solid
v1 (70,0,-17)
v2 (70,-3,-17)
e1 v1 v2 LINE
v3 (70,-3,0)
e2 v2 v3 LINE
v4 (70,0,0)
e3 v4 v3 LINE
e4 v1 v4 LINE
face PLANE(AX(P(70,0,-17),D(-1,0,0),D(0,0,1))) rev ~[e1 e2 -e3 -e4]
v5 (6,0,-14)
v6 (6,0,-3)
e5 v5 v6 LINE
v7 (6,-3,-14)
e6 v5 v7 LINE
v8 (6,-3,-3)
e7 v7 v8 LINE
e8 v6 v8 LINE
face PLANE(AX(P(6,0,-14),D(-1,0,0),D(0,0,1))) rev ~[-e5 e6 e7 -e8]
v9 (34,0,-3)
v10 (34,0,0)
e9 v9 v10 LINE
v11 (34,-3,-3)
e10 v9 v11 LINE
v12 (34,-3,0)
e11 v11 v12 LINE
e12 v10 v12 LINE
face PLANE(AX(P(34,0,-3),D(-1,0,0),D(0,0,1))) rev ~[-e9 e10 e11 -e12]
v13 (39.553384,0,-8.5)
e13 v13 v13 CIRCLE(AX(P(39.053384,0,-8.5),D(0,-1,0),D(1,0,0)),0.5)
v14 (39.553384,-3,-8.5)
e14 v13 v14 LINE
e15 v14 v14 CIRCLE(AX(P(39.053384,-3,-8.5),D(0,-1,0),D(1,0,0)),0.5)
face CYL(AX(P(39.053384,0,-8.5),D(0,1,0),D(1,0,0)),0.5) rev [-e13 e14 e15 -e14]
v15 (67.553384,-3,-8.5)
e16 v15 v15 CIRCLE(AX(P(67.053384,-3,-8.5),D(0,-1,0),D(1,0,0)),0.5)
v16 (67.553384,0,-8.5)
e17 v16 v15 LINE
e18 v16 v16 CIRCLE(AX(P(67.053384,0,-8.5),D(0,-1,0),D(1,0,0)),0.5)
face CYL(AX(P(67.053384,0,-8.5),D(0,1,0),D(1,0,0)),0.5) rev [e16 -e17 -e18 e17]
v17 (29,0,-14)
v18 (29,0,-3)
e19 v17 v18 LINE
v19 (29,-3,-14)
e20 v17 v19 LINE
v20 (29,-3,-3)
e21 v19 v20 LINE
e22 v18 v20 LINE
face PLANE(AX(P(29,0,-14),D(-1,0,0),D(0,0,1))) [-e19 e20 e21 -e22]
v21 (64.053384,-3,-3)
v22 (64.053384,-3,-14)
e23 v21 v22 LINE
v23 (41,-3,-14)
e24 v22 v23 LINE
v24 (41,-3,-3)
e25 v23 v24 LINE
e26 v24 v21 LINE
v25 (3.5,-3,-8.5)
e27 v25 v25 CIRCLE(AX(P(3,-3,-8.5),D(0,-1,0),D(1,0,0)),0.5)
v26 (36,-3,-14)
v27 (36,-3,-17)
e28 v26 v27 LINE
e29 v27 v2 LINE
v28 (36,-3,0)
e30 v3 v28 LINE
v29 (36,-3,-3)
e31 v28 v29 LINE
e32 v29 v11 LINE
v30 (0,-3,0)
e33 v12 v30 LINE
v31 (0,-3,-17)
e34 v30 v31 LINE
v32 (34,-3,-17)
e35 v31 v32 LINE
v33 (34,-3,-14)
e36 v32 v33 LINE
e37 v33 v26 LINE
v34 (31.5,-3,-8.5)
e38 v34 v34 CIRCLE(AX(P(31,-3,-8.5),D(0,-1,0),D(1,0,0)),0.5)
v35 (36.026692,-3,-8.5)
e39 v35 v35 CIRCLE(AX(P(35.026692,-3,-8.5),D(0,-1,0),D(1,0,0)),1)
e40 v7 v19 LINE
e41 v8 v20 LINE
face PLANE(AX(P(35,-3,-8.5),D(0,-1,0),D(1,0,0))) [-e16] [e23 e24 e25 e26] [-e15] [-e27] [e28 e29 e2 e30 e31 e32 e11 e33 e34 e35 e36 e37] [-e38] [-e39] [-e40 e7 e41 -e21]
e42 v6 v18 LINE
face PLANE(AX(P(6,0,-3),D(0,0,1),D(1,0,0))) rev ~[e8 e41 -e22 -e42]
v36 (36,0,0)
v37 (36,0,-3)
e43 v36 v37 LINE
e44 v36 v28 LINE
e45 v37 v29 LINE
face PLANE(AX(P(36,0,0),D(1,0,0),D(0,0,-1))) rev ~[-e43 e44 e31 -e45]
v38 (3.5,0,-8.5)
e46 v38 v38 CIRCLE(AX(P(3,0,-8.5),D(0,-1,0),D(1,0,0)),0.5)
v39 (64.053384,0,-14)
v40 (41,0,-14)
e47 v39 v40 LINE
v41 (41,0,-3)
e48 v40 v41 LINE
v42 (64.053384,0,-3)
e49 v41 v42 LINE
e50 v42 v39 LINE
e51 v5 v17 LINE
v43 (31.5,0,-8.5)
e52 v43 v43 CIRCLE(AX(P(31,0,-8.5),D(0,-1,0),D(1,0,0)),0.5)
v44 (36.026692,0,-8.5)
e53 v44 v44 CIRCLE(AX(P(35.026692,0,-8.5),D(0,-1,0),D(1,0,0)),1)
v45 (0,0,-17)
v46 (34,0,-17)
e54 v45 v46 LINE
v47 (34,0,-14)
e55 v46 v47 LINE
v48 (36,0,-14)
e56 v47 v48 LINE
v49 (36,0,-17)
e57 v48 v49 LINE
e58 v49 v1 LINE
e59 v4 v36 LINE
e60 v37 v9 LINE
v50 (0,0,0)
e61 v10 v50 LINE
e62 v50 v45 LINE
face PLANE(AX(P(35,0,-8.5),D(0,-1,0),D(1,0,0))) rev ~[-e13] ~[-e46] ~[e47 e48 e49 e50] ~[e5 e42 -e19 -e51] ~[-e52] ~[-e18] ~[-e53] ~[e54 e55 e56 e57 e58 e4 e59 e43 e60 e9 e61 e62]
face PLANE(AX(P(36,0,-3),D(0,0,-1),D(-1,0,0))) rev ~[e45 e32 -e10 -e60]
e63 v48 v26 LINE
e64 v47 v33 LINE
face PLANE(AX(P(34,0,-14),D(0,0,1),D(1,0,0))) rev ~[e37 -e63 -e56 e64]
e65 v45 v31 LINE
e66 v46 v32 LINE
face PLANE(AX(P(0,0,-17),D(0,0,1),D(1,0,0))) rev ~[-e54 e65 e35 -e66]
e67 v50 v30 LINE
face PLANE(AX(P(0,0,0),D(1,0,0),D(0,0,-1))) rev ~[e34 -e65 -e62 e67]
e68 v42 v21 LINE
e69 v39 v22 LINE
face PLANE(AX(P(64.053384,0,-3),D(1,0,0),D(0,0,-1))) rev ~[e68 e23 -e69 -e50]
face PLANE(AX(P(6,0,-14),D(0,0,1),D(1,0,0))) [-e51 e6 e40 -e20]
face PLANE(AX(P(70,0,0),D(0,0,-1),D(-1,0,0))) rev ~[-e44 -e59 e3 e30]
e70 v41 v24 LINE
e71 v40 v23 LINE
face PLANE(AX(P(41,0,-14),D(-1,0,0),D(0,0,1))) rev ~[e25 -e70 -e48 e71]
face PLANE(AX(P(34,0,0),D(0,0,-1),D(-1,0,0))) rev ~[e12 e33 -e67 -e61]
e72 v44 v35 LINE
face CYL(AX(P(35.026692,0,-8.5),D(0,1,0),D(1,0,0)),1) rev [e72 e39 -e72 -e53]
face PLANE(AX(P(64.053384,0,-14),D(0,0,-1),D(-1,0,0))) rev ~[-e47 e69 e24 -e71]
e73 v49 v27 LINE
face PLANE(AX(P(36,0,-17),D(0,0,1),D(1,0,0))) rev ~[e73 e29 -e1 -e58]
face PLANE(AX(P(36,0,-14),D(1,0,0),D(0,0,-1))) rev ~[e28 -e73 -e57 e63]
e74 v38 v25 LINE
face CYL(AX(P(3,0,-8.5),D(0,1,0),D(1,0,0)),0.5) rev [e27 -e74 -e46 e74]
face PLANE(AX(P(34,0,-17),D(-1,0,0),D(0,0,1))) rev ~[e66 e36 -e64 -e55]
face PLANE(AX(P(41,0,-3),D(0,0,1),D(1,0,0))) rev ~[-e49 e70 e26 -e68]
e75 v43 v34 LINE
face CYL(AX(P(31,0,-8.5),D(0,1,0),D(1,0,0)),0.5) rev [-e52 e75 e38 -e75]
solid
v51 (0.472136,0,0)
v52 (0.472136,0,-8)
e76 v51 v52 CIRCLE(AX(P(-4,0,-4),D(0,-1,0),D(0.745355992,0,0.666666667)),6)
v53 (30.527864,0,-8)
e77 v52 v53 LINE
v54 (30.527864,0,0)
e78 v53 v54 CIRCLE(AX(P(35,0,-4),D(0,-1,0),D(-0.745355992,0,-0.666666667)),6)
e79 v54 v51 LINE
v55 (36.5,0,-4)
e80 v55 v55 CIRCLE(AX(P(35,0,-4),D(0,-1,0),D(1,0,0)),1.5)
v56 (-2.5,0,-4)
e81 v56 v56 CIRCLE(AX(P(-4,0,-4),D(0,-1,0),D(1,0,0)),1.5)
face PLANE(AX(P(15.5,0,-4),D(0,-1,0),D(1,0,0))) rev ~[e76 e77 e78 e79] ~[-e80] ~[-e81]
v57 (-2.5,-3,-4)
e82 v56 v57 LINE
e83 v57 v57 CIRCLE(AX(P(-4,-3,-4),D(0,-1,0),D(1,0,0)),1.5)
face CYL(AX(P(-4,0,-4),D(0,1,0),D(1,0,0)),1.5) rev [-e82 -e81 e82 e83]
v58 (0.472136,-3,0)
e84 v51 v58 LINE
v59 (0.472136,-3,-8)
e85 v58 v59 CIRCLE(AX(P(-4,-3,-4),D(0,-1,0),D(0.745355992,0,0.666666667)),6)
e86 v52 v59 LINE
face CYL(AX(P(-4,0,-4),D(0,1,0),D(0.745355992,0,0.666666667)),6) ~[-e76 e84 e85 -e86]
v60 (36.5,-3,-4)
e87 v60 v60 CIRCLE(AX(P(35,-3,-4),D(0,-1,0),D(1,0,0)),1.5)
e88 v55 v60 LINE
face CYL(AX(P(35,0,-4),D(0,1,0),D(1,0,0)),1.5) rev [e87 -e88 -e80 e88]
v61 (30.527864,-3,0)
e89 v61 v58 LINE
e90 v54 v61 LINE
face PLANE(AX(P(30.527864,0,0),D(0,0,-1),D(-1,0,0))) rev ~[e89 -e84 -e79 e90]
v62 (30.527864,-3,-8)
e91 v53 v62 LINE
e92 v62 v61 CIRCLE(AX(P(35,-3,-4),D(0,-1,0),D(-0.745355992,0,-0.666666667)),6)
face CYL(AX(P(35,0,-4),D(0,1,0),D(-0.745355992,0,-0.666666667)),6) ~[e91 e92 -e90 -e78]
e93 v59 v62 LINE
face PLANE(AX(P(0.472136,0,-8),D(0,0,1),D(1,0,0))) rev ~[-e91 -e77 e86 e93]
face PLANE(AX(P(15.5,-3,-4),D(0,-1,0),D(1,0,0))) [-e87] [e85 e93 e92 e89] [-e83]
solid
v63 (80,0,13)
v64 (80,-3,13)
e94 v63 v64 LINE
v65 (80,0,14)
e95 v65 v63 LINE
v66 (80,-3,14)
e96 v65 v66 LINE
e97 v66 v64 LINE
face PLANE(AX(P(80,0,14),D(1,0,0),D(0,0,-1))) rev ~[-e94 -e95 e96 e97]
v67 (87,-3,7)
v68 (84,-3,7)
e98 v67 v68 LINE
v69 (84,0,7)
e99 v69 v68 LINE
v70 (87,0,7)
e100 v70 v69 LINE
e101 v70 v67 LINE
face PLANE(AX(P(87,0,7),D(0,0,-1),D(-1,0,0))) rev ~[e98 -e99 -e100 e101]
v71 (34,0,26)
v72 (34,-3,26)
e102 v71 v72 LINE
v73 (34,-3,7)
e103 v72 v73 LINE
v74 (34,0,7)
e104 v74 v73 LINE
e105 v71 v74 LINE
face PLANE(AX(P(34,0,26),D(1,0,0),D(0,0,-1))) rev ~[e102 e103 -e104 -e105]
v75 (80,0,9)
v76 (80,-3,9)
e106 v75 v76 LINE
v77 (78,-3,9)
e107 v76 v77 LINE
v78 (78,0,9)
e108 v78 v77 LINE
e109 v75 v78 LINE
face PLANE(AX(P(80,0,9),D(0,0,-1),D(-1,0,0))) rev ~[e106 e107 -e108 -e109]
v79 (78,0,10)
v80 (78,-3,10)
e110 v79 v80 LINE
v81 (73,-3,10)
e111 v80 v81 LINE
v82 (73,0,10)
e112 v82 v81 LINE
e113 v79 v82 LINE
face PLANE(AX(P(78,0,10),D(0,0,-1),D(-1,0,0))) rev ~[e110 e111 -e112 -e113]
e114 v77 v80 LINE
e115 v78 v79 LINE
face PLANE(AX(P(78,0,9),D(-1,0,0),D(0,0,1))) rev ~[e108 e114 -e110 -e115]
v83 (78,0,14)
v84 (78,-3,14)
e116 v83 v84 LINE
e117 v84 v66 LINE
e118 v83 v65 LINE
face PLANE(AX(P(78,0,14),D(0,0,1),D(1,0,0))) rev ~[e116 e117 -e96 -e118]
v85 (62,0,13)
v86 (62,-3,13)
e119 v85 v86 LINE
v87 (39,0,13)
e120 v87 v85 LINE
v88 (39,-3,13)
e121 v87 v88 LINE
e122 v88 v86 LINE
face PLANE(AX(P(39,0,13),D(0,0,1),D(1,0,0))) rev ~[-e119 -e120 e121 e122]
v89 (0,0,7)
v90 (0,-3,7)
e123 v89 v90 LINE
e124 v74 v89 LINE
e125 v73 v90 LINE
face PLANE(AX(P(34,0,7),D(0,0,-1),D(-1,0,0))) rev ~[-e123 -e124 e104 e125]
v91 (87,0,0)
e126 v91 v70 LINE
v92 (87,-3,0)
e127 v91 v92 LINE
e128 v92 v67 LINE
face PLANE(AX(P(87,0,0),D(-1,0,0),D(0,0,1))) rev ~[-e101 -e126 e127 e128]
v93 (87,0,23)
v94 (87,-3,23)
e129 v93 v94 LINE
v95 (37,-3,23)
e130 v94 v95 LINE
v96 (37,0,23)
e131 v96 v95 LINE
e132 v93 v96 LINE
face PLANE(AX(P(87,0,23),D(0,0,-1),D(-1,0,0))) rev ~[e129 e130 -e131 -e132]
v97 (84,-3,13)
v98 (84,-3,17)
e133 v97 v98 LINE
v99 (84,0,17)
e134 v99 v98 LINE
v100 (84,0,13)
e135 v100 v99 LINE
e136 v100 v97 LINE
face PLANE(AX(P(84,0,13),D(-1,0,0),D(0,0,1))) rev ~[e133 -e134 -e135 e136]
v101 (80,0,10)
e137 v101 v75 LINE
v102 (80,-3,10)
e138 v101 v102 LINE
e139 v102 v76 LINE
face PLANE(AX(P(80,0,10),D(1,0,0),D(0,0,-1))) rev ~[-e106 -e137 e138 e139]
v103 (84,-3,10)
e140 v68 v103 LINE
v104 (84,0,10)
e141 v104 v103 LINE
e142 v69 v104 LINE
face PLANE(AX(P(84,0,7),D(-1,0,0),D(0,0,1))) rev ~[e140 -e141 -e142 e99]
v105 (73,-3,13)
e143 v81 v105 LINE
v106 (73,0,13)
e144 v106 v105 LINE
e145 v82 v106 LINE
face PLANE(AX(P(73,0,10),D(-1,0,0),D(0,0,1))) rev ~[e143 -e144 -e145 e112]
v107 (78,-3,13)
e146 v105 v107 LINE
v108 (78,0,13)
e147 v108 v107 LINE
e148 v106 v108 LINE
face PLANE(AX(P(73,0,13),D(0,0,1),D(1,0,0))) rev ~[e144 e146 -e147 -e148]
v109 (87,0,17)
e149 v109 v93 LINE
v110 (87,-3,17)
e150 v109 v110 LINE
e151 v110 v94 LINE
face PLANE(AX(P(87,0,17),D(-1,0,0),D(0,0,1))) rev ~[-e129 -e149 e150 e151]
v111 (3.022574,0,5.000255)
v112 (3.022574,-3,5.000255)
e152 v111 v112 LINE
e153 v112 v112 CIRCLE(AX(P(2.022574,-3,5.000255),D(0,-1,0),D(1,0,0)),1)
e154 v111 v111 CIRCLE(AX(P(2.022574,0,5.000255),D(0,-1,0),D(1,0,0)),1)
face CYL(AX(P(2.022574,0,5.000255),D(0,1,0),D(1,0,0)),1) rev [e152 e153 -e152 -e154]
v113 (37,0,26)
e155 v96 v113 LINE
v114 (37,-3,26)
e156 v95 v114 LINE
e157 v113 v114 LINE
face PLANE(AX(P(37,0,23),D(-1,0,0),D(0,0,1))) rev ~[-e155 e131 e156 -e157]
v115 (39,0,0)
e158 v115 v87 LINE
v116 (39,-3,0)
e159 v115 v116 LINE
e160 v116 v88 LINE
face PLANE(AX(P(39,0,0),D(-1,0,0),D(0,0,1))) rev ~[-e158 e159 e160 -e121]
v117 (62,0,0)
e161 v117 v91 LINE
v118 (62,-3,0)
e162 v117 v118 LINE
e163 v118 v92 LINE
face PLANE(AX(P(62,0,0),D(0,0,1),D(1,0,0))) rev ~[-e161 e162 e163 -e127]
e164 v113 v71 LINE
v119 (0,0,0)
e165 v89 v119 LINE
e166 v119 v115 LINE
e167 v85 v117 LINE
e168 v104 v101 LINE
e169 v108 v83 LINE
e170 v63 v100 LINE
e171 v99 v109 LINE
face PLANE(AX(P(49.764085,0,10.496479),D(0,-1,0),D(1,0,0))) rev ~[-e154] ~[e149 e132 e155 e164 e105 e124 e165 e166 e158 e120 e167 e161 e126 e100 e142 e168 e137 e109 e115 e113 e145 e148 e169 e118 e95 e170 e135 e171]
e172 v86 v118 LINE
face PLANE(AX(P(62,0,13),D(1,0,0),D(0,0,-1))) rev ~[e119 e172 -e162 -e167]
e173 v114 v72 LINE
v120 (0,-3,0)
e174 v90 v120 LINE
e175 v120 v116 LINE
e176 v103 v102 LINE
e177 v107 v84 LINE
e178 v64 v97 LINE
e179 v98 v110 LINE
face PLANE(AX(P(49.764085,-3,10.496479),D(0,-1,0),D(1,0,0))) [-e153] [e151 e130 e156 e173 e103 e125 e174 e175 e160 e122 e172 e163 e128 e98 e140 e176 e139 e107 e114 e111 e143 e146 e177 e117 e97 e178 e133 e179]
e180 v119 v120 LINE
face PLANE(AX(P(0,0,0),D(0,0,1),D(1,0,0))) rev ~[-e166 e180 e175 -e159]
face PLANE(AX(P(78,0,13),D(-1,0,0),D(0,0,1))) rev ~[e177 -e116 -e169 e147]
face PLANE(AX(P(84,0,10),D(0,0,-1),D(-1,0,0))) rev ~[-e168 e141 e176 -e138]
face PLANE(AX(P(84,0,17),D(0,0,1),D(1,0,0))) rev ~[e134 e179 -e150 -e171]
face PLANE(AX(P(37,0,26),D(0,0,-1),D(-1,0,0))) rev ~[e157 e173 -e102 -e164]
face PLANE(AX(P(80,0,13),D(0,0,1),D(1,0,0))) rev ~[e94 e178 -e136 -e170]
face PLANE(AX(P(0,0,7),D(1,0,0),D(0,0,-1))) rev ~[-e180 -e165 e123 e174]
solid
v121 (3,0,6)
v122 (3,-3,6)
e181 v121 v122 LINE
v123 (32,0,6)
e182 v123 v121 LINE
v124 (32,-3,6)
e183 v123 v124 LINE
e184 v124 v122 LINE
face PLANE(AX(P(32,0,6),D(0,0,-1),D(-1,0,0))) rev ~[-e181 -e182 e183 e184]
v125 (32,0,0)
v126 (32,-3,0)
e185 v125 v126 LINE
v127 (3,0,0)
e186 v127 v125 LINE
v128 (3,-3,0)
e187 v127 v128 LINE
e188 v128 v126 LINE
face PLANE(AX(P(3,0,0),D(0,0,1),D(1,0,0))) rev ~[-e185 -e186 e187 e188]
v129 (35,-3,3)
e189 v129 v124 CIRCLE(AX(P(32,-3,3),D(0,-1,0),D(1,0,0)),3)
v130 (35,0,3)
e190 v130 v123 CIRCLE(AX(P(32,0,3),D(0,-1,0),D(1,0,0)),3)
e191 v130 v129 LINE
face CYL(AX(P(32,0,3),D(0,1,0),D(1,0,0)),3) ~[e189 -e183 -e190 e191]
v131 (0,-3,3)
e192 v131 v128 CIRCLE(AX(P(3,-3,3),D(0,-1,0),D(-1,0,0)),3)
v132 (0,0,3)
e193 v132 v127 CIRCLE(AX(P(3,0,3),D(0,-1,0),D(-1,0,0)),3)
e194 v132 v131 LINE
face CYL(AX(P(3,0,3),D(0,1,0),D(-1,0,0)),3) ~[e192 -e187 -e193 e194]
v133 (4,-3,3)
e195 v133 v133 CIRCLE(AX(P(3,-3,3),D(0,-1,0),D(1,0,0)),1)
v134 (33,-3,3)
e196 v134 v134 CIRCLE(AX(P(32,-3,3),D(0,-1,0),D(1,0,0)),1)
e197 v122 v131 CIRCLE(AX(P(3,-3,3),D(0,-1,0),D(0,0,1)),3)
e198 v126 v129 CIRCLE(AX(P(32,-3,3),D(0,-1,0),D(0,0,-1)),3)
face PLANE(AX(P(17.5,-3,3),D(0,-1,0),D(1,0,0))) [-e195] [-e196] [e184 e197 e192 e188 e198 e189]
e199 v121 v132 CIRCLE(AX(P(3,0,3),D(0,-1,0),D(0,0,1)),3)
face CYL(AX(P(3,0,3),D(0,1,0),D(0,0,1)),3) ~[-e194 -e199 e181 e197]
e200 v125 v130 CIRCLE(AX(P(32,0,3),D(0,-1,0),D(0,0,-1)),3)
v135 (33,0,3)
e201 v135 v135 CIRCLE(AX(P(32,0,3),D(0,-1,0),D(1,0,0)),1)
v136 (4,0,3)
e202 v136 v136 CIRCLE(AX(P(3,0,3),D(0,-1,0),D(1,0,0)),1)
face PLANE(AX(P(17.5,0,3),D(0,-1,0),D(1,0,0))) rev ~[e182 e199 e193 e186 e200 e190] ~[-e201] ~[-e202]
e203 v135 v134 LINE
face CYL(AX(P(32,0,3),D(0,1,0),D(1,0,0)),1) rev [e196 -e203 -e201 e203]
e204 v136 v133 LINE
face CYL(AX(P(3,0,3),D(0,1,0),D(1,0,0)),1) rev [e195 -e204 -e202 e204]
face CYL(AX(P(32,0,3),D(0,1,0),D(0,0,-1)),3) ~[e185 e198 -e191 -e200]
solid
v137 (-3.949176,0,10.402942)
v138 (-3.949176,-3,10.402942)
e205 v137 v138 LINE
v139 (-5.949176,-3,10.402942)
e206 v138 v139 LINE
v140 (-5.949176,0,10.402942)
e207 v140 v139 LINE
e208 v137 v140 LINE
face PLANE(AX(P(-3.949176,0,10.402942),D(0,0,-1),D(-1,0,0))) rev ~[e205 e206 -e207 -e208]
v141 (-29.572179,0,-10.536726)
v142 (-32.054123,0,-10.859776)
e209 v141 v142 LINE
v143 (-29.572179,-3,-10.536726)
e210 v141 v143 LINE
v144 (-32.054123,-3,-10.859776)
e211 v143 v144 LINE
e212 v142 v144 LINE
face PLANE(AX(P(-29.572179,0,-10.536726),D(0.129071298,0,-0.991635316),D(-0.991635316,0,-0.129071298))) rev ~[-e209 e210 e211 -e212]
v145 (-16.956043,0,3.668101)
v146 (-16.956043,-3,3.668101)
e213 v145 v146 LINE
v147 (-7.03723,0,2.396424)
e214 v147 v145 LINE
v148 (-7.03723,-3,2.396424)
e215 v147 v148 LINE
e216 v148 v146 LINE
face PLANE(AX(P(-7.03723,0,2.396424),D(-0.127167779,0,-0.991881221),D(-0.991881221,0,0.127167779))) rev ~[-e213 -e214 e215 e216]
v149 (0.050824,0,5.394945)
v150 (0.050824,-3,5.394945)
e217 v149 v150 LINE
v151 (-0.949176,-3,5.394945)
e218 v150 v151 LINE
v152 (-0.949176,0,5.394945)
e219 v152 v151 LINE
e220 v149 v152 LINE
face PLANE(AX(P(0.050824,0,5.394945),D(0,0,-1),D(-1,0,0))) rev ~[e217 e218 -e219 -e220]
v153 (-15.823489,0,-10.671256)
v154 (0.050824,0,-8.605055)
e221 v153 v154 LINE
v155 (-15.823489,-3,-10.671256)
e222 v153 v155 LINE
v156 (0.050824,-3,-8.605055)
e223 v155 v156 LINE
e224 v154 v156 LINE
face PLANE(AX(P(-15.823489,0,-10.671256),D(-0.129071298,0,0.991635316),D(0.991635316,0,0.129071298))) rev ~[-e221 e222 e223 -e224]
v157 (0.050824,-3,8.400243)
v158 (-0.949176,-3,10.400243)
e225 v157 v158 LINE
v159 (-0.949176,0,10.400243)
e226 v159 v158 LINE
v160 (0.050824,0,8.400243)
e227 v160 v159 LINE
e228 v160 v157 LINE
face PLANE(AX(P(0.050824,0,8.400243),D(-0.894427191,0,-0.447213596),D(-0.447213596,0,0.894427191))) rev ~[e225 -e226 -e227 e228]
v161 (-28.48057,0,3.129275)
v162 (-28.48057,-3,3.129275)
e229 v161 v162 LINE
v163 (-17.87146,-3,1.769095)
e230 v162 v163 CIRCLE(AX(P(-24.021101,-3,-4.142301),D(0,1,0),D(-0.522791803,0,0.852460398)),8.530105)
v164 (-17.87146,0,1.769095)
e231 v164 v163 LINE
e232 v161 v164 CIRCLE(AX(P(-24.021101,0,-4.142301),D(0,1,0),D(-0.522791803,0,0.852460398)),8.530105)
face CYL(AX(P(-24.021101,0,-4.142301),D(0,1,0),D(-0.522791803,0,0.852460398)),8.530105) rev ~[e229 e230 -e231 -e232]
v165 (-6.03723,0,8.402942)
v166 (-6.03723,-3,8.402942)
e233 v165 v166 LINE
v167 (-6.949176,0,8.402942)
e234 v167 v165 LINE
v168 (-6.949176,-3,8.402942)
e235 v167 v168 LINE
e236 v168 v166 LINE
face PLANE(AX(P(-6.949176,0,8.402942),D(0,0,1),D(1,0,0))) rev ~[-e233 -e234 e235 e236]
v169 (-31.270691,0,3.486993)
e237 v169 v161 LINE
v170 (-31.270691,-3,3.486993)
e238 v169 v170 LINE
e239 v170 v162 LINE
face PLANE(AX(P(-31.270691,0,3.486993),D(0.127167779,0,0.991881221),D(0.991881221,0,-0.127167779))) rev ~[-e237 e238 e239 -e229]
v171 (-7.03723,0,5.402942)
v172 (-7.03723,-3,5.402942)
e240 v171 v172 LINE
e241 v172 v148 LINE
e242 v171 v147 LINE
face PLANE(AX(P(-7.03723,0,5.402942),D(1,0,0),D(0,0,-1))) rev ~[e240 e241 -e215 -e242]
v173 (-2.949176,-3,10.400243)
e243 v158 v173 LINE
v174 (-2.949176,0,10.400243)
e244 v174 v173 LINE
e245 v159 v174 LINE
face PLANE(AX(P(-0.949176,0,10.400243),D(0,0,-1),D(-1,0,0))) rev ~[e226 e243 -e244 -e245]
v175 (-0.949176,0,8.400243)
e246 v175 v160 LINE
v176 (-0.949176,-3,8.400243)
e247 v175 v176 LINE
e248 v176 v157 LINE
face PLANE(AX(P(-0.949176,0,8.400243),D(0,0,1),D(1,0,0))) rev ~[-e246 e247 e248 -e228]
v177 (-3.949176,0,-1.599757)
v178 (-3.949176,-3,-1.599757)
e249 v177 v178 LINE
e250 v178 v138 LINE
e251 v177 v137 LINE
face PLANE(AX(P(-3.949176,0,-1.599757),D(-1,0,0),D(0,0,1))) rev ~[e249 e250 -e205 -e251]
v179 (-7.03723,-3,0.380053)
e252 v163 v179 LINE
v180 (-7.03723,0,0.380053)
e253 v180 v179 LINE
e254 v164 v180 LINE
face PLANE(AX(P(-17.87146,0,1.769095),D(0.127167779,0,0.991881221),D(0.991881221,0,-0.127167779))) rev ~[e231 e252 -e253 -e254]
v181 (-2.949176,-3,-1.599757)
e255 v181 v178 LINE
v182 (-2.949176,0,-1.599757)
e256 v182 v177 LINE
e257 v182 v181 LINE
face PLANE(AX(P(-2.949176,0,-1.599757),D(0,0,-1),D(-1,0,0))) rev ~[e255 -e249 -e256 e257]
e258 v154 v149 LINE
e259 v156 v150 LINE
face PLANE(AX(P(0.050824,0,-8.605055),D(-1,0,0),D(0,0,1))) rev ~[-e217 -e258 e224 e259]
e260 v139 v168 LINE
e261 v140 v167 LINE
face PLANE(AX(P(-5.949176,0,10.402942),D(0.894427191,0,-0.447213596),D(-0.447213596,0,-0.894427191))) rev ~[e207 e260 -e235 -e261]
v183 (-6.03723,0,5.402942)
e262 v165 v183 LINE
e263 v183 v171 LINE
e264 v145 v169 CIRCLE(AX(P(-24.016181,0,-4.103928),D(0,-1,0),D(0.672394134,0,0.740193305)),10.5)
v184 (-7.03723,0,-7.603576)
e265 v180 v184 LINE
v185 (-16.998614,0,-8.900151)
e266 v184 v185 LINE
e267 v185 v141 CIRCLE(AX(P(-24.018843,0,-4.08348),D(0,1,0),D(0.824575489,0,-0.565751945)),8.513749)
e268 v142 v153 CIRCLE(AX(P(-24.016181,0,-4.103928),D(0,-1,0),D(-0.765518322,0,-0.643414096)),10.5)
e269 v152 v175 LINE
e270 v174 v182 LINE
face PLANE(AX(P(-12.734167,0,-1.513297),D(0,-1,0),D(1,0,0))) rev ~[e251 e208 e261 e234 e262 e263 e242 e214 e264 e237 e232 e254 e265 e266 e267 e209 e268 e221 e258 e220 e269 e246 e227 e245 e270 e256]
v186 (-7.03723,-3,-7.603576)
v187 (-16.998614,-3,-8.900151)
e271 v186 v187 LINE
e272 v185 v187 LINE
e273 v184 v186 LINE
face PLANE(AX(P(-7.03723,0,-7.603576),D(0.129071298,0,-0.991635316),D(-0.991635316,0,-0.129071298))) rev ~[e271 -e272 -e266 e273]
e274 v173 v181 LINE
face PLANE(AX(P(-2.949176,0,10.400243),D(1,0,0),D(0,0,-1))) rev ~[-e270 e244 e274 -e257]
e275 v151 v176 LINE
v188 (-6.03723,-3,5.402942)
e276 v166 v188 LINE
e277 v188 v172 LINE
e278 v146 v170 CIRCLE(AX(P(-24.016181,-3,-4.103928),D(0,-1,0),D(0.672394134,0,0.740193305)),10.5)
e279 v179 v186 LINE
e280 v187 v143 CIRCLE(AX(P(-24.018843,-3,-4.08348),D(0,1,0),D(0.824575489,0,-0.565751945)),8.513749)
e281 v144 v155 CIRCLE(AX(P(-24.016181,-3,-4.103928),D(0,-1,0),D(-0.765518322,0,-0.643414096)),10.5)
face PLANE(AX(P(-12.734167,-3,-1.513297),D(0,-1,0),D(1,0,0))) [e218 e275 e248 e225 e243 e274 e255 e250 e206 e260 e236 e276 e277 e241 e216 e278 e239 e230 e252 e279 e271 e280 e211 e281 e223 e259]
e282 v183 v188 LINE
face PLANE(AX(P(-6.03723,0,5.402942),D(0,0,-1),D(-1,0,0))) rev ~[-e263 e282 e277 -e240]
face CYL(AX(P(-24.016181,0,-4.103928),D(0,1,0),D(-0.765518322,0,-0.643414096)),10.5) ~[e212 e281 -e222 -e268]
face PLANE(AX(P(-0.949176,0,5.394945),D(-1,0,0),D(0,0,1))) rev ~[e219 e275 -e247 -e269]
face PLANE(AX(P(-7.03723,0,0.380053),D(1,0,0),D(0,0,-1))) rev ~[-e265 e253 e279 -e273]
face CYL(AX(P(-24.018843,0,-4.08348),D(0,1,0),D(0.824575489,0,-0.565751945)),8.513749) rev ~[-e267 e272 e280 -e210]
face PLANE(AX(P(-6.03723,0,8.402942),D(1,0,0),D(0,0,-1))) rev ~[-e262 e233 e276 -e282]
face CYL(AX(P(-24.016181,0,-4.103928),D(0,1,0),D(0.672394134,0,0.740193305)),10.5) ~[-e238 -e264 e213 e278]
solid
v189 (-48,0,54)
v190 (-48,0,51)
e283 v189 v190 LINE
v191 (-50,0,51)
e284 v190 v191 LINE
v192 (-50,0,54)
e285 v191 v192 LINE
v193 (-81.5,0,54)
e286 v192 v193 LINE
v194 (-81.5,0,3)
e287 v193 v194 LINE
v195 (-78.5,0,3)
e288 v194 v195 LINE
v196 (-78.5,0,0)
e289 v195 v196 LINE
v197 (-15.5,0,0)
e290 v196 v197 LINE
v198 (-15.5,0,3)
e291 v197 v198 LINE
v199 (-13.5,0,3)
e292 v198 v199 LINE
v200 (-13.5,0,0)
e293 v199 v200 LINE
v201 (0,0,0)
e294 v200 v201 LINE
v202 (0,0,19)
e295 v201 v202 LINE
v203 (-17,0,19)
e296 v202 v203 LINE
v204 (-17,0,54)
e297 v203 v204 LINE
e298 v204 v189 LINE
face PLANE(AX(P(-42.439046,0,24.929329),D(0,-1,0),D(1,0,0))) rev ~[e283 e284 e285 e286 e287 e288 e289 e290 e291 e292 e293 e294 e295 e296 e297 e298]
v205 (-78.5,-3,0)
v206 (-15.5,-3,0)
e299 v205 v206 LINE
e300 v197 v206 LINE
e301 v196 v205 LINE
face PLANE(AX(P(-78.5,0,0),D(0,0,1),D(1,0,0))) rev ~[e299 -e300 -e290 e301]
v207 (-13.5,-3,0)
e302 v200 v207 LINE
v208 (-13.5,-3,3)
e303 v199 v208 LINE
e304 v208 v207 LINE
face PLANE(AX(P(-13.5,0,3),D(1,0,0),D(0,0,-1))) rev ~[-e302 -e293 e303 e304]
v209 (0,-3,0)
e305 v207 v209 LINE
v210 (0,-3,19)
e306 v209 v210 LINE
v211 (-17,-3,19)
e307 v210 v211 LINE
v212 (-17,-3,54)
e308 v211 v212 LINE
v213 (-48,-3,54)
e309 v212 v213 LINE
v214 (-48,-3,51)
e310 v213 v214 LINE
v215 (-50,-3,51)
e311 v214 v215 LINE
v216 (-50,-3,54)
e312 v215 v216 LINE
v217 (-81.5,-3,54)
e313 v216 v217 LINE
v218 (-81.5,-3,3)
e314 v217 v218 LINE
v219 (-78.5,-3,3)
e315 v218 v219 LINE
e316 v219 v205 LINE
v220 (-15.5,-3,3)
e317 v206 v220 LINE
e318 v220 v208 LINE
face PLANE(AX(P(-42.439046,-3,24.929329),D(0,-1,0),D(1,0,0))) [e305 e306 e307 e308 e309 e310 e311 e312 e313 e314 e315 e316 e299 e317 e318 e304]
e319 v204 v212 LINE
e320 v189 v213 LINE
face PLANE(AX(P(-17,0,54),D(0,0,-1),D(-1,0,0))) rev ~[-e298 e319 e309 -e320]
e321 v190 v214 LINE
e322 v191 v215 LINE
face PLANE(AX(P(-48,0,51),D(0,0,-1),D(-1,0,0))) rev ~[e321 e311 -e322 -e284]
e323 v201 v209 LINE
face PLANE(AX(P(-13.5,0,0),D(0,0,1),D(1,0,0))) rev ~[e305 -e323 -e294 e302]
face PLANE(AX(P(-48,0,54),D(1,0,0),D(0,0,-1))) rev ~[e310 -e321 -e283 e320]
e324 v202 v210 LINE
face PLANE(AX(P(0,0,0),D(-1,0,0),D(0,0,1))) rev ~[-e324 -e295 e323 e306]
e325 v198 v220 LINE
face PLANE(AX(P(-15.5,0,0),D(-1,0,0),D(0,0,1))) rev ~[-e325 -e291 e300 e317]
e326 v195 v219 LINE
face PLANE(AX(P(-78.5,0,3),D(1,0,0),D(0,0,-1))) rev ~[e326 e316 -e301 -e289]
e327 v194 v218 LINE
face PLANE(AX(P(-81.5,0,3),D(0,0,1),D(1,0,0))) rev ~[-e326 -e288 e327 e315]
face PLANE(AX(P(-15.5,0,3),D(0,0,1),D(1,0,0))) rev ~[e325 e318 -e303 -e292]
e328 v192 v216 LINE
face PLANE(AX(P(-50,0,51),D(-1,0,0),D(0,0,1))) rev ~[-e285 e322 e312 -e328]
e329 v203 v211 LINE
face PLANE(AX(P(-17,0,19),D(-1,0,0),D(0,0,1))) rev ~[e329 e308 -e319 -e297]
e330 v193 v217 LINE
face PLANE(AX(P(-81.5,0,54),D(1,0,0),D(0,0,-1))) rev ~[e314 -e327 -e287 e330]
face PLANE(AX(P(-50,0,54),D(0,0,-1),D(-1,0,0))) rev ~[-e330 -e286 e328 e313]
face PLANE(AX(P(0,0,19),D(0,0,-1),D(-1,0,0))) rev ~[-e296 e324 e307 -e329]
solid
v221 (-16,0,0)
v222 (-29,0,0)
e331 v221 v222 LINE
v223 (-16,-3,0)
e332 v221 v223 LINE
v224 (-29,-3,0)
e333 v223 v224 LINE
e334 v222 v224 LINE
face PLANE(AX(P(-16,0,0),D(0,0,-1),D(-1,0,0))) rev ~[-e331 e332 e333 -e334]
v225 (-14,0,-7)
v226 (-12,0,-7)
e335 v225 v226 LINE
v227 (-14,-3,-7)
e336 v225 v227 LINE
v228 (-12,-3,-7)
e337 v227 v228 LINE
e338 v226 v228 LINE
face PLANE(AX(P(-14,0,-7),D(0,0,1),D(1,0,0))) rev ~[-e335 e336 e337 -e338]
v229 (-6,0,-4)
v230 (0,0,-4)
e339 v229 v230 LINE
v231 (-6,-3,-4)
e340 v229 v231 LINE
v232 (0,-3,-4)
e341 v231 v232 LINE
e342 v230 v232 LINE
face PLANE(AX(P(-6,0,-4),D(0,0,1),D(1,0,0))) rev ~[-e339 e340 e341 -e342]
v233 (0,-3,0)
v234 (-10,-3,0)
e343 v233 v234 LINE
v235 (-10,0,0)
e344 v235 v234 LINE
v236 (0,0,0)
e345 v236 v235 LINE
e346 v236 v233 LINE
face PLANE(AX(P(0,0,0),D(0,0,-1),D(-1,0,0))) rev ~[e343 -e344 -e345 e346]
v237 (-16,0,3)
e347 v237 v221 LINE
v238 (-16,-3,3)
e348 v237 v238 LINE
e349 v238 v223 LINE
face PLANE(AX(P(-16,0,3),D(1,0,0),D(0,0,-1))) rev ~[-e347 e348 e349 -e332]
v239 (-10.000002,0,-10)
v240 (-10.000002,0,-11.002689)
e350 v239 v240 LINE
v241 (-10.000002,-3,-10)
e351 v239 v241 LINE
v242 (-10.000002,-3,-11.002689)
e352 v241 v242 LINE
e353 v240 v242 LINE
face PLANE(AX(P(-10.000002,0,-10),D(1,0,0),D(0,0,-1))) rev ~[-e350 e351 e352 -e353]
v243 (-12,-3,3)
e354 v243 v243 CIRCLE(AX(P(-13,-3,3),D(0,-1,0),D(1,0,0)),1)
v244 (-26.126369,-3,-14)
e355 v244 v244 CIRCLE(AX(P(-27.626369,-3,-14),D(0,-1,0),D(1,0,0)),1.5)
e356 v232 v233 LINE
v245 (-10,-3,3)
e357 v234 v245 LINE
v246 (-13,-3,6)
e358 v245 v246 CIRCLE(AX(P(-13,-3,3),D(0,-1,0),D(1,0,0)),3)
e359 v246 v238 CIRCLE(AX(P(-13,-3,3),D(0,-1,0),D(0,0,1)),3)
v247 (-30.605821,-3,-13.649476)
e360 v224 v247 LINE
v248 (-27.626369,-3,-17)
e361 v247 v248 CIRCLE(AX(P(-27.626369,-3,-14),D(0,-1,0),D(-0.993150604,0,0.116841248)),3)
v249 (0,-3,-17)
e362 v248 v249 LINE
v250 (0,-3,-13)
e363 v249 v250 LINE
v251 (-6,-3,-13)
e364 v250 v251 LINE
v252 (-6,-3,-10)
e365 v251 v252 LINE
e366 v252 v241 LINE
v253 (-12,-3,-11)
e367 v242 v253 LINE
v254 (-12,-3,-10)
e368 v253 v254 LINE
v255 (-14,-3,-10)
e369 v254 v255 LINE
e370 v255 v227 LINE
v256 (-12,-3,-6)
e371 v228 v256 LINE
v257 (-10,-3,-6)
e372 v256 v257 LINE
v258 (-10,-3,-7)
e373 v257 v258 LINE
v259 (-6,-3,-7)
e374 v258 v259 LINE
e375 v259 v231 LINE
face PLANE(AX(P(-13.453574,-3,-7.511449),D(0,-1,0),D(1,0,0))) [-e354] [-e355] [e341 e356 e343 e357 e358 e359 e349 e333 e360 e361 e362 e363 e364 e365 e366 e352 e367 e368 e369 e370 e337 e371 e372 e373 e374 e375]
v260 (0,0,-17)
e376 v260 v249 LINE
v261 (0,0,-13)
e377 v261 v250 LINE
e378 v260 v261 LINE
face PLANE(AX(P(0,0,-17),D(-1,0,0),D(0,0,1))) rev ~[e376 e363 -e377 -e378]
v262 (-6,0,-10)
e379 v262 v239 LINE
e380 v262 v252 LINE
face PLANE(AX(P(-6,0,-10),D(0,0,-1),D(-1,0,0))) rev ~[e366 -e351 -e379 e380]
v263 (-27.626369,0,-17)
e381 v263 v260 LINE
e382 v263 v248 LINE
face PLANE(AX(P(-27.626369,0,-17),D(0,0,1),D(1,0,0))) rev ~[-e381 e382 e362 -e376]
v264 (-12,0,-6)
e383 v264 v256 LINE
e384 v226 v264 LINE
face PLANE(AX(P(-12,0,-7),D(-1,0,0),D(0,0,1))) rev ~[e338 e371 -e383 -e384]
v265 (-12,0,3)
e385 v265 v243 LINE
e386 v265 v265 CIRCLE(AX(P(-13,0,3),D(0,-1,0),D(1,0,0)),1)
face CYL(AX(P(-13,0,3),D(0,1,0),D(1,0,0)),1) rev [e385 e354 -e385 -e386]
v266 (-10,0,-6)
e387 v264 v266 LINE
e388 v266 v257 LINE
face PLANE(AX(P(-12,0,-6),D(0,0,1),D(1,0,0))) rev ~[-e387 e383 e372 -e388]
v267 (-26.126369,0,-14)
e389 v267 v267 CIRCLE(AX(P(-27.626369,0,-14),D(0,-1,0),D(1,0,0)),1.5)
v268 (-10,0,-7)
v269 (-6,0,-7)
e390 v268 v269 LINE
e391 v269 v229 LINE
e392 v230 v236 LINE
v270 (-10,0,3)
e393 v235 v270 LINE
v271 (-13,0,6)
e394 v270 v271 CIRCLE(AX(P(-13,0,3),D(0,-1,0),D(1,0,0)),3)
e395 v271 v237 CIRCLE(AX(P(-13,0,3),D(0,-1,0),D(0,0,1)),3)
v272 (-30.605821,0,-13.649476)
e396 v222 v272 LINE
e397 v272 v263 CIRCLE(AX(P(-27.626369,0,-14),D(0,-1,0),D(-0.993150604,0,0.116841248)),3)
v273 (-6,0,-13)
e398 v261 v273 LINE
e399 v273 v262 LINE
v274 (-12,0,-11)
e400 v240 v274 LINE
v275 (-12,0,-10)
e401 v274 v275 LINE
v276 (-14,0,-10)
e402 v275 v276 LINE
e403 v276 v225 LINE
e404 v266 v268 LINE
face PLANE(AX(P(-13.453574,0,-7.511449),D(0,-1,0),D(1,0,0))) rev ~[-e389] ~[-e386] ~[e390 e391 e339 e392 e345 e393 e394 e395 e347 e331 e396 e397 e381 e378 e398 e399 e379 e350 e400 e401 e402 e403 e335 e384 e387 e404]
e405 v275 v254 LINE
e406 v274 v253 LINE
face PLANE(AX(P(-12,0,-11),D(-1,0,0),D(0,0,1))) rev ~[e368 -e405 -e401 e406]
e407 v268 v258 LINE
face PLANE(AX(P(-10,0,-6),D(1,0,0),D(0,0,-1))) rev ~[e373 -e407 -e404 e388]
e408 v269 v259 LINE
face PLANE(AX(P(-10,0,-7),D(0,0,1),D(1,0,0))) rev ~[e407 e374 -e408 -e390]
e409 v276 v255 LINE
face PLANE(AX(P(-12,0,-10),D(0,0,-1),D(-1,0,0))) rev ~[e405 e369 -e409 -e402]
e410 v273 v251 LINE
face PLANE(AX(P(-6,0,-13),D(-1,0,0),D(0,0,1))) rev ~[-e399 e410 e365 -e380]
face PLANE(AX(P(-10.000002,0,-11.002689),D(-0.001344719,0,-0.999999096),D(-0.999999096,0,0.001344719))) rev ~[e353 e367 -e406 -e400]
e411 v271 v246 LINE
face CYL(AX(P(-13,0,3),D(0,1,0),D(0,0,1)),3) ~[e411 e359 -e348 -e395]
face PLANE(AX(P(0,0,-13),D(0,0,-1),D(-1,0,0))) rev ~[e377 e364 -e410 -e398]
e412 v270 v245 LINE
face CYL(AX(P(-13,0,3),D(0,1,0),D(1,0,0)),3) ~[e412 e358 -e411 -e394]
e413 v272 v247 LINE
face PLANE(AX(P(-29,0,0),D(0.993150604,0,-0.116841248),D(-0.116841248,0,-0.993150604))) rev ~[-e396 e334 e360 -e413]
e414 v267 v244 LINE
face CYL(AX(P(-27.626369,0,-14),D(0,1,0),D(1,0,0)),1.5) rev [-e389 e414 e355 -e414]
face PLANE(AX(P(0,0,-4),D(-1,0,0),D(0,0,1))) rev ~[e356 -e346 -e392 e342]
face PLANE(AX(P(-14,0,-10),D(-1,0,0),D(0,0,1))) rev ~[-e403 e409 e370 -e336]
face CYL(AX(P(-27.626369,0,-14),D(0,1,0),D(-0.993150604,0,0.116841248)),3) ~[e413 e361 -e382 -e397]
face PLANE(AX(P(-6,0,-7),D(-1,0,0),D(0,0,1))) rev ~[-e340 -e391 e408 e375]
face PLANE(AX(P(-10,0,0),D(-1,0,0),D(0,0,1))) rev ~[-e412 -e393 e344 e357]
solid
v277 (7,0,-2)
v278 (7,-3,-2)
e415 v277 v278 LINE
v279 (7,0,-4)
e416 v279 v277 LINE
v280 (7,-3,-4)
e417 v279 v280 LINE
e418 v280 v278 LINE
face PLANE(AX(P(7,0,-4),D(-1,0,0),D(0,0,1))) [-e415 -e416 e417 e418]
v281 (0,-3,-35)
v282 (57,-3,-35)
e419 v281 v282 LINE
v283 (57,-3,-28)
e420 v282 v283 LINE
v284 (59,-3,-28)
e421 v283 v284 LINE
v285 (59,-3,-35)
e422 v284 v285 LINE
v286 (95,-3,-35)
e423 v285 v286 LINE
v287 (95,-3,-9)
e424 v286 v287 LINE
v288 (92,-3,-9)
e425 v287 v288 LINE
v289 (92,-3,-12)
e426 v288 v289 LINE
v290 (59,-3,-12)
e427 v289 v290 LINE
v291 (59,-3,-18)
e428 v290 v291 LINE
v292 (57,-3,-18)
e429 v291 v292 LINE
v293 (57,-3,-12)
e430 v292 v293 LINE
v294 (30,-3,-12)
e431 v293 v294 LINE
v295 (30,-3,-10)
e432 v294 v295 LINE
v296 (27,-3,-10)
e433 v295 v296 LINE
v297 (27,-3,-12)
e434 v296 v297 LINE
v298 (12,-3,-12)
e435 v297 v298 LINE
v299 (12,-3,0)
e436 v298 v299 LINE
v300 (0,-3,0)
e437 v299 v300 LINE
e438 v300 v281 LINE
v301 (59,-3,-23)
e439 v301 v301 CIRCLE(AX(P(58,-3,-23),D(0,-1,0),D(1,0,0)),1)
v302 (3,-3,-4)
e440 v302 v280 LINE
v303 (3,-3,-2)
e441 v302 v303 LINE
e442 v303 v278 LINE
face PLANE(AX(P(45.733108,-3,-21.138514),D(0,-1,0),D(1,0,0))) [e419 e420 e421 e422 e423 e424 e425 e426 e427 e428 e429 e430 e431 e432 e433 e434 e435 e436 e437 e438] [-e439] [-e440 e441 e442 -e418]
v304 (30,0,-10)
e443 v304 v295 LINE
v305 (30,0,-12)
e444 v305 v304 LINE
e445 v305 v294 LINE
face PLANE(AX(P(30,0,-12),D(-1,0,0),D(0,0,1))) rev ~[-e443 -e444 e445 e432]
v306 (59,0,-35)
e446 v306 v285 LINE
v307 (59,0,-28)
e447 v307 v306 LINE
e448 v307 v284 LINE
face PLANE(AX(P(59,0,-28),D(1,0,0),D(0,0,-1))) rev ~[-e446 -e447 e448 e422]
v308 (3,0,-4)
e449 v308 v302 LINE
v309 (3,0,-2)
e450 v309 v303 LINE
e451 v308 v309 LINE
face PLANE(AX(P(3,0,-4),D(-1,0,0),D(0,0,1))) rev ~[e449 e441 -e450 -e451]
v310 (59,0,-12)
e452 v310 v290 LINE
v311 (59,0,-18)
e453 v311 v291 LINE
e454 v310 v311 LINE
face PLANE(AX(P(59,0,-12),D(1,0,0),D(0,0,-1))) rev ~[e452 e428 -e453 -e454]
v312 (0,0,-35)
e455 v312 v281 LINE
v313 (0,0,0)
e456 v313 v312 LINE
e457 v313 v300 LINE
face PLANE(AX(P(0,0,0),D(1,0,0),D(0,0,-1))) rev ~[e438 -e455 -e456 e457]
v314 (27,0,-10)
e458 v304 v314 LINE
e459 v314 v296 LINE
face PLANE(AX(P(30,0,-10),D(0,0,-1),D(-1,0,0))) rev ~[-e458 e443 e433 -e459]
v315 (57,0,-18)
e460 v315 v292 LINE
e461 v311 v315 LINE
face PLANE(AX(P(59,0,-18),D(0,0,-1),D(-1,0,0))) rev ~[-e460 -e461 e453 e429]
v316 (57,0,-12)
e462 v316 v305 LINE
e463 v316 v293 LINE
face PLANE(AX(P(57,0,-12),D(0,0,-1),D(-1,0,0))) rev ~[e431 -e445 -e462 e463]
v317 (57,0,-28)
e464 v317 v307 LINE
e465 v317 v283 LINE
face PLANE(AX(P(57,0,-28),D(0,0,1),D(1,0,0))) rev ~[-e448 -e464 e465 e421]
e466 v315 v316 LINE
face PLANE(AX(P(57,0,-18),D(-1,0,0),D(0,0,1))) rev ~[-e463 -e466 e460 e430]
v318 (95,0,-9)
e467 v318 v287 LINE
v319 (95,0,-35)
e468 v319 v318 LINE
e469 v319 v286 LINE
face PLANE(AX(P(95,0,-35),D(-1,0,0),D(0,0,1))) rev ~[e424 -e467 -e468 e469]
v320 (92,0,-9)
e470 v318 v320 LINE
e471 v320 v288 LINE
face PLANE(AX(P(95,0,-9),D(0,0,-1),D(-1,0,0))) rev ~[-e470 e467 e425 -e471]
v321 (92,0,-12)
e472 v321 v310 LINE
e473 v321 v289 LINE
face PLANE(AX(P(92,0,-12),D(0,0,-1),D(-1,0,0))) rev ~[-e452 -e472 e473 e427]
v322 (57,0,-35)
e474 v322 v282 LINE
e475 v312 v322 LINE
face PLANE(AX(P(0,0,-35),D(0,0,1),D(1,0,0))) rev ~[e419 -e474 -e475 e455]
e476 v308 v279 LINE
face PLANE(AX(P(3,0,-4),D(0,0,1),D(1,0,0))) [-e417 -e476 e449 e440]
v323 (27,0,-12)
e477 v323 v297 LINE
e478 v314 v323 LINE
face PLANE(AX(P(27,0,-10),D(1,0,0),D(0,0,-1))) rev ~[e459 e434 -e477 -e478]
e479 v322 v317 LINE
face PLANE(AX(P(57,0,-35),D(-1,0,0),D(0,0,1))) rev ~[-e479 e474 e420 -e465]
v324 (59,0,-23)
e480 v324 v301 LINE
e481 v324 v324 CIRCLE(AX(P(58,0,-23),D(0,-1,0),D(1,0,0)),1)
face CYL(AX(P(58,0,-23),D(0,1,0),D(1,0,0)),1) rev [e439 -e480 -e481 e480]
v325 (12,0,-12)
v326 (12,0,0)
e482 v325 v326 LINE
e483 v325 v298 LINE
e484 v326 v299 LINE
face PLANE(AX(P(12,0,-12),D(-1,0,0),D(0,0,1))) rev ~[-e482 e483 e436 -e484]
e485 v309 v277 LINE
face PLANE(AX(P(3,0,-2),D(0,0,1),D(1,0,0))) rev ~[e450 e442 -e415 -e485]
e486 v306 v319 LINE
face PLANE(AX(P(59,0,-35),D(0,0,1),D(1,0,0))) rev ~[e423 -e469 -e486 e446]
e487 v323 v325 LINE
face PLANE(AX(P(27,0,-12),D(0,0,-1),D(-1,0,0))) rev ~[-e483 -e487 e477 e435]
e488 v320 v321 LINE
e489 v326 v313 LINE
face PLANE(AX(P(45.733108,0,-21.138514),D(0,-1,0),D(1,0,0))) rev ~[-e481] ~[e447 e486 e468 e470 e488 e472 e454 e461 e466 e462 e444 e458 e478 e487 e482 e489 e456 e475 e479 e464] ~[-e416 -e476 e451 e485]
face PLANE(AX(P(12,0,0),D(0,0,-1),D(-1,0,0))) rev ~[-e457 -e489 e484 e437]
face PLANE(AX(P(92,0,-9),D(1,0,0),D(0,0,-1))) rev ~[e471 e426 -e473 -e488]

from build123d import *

# Parameters (mm, degrees)
F1_DEPTH  = 3
F2_R      = 0.5
F2_W      = 23
F2_H      = 11
F2_R_2    = 1
F3_DEPTH  = 3
F4_R      = 1
F5_DEPTH  = 3
F6_R      = 1
F7_DEPTH  = 3
F8_R      = 1.5
F8_R_2    = 1
F9_DEPTH  = 3
F10_R     = 1
F10_W     = 4
F10_H     = 2
F11_DEPTH = 3
F13_DEPTH = 3
F14_R     = 1.5
F15_DEPTH = 3


# Not quite as in the source:
# - a feature names something its author has since deleted; it is built from what else it names


with BuildPart() as f1:
    # F0 (on Front) → F1 (new body)
    with BuildSketch(Plane.XZ):
        Polygon((-13.5, 0), (0, 0), (0, 19), (-17, 19), (-17, 54), (-48, 54), (-48, 51), (-50, 51), (-50, 54), (-81.5, 54), (-81.5, 3), (-78.5, 3), (-78.5, 0), (-15.5, 0), (-15.5, 3), (-13.5, 3), align=None)
    extrude(amount=F1_DEPTH)


with BuildPart() as f3:
    # F2 (on Front) → F3 (new body)
    with BuildSketch(Plane.XZ):
        Polygon((34, 0), (0, 0), (0, -17), (34, -17), (34, -14), (36, -14), (36, -17), (70, -17), (70, 0), (36, 0), (36, -3), (34, -3), align=None)
        with Locations((3, -8.5)):
            Circle(F2_R, mode=Mode.SUBTRACT)
        with Locations((17.5, -8.5)):
            Rectangle(F2_W, F2_H, mode=Mode.SUBTRACT)
        with Locations((31, -8.5)):
            Circle(F2_R, mode=Mode.SUBTRACT)
        with Locations((35.026691854, -8.5)):
            Circle(F2_R_2, mode=Mode.SUBTRACT)
        with Locations((39.053383708, -8.5)):
            Circle(F2_R, mode=Mode.SUBTRACT)
        Polygon((41, -14), (41, -3), (41.053383708, -3), (64, -3), (64.053383708, -3), (64.053383708, -14), (64, -14), (41.053383708, -14), align=None, mode=Mode.SUBTRACT)
        with Locations((67.053383708, -8.5)):
            Circle(F2_R, mode=Mode.SUBTRACT)
    extrude(amount=F3_DEPTH)


with BuildPart() as f5:
    # F4 (on Front) → F5 (new body)
    with BuildSketch(Plane.XZ):
        with BuildLine():
            ThreePointArc((0, 3), (0.8786796564, 0.8786796564), (3, 0))
            Line((3, 0), (32, 0))
            ThreePointArc((32, 0), (34.1213203436, 0.8786796564), (35, 3))
            ThreePointArc((35, 3), (34.1213203436, 5.1213203436), (32, 6))
            Line((32, 6), (3, 6))
            ThreePointArc((3, 6), (0.8786796564, 5.1213203436), (0, 3))
        make_face()
        with Locations((3, 3)):
            Circle(F4_R, mode=Mode.SUBTRACT)
        with Locations((32, 3)):
            Circle(F4_R, mode=Mode.SUBTRACT)
    extrude(amount=F5_DEPTH)


with BuildPart() as f7:
    # F6 (on Front) → F7 (new body)
    with BuildSketch(Plane.XZ):
        Polygon((0, 7), (0, 0), (39, 0), (39, 13), (62, 13), (62, 0), (87, 0), (87, 7), (84, 7), (84, 10), (80, 10), (80, 9), (78, 9), (78, 10), (73, 10), (73, 13), (78, 13), (78, 14), (80, 14), (80, 13), (84, 13), (84, 17), (87, 17), (87, 23), (37, 23), (37, 26), (34, 26), (34, 7), align=None)
        with Locations((2.0225740552, 5.0002548265)):
            Circle(F6_R, mode=Mode.SUBTRACT)
    extrude(amount=F7_DEPTH)


with BuildPart() as f9:
    # F8 (on Front) → F9 (new body)
    with BuildSketch(Plane.XZ):
        with BuildLine():
            Line((0, -4), (0, 0))
            Line((0, 0), (-10, 0))
            Line((-10, 0), (-10, 3))
            ThreePointArc((-10, 3), (-10.8786796564, 5.1213203436), (-13, 6))
            ThreePointArc((-13, 6), (-15.1213203436, 5.1213203436), (-16, 3))
            Line((-16, 3), (-16, 0))
            Line((-16, 0), (-29, 0))
            Line((-29, 0), (-30.6058207362, -13.6494762573))
            ThreePointArc((-30.6058207362, -13.6494762573), (-29.8681953246, -15.9935431738), (-27.6263689232, -17))
            Line((-27.6263689232, -17), (0, -17))
            Line((0, -17), (0, -13))
            Line((0, -13), (-6, -13))
            Line((-6, -13), (-6, -10))
            Line((-6, -10), (-10.0000018083, -10))
            Line((-10.0000018083, -10), (-10.0000018083, -11.0026894372))
            Line((-10.0000018083, -11.0026894372), (-12, -11))
            Line((-12, -11), (-12, -10))
            Line((-12, -10), (-14, -10))
            Line((-14, -10), (-14, -7))
            Line((-14, -7), (-12, -7))
            Line((-12, -7), (-12, -6))
            Line((-12, -6), (-10, -6))
            Line((-10, -6), (-10, -7))
            Line((-10, -7), (-6, -7))
            Line((-6, -7), (-6, -4))
            Line((-6, -4), (0, -4))
        make_face()
        with Locations((-27.6263689232, -14)):
            Circle(F8_R, mode=Mode.SUBTRACT)
        with Locations((-13, 3)):
            Circle(F8_R_2, mode=Mode.SUBTRACT)
    extrude(amount=F9_DEPTH)


with BuildPart() as f11:
    # F10 (on Front) → F11 (new body)
    with BuildSketch(Plane.XZ):
        Polygon((12, 0), (0, 0), (0, -35), (57, -35), (57, -28), (59, -28), (59, -35), (95, -35), (95, -9), (92, -9), (92, -12), (59, -12), (59, -18), (57, -18), (57, -12), (30, -12), (30, -10), (27, -10), (27, -12), (12, -12), align=None)
        with Locations((58, -23)):
            Circle(F10_R, mode=Mode.SUBTRACT)
        with Locations((5, -3)):
            Rectangle(F10_W, F10_H, mode=Mode.SUBTRACT)
    extrude(amount=F11_DEPTH)


with BuildPart() as f13:
    # F12 (on Front) → F13 (new body)
    with BuildSketch(Plane.XZ):
        with BuildLine():
            Line((-0.9491760544, 8.4002428828), (0.0508239456, 8.4002428828))
            Line((0.0508239456, 8.4002428828), (-0.9491760544, 10.4002428828))
            Line((-0.9491760544, 10.4002428828), (-2.9491760544, 10.4002428828))
            Line((-2.9491760544, 10.4002428828), (-2.9491760544, -1.5997571172))
            Line((-2.9491760544, -1.5997571172), (-3.9491760544, -1.5997571172))
            Line((-3.9491760544, -1.5997571172), (-3.9491760544, 10.4002428828))
            Line((-3.9491760544, 10.4002428828), (-3.9491760544, 10.4029415973))
            Line((-3.9491760544, 10.4029415973), (-5.9491760544, 10.4029415973))
            Line((-5.9491760544, 10.4029415973), (-6.9491760544, 8.4029415973))
            Line((-6.9491760544, 8.4029415973), (-6.0372303978, 8.4029415973))
            Line((-6.0372303978, 8.4029415973), (-6.0372303978, 5.4029415973))
            Line((-6.0372303978, 5.4029415973), (-7.0372303978, 5.4029415973))
            Line((-7.0372303978, 5.4029415973), (-7.0372303978, 2.396423577))
            Line((-7.0372303978, 2.396423577), (-16.9560426049, 3.6681013667))
            ThreePointArc((-16.9560426049, 3.6681013667), (-24.1489246045, 6.3880111742), (-31.2706908491, 3.4869930119))
            Line((-31.2706908491, 3.4869930119), (-28.4805696202, 3.1292752607))
            ThreePointArc((-28.4805696202, 3.1292752607), (-22.9352548858, 4.3270620373), (-17.8714603281, 1.769095395))
            Line((-17.8714603281, 1.769095395), (-7.0372303978, 0.3800531102))
            Line((-7.0372303978, 0.3800531102), (-7.0372303978, -7.603576423))
            Line((-7.0372303978, -7.603576423), (-16.9986135566, -8.9001505061))
            ThreePointArc((-16.9986135566, -8.9001505061), (-22.9190749769, -12.5328285255), (-29.5721786871, -10.5367263131))
            Line((-29.5721786871, -10.5367263131), (-32.0541233857, -10.8597763475))
            ThreePointArc((-32.0541233857, -10.8597763475), (-23.8942422369, -14.6022225149), (-15.8234885699, -10.6712558493))
            Line((-15.8234885699, -10.6712558493), (0.0508239456, -8.6050546132))
            Line((0.0508239456, -8.6050546132), (0.0508239456, 5.3949453868))
            Line((0.0508239456, 5.3949453868), (-0.9491760544, 5.3949453868))
            Line((-0.9491760544, 5.3949453868), (-0.9491760544, 8.4002428828))
        make_face()
        with BuildLine():
            ThreePointArc((-32.0541233857, -10.8597763475), (-23.8942306495, -14.6032201296), (-15.8234885699, -10.6712558493))
            ThreePointArc((-15.8234885699, -10.6712558493), (-23.8942422369, -14.6022225149), (-32.0541233857, -10.8597763475))
        make_face()
        with BuildLine():
            ThreePointArc((-16.9986135566, -8.9001505061), (-22.9199618583, -12.5260147495), (-29.5721786871, -10.5367263131))
            ThreePointArc((-29.5721786871, -10.5367263131), (-22.9190749769, -12.5328285255), (-16.9986135566, -8.9001505061))
        make_face()
        with BuildLine():
            ThreePointArc((-28.4805696202, 3.1292752607), (-22.9363462684, 4.3185494883), (-17.8714603281, 1.769095395))
            ThreePointArc((-17.8714603281, 1.769095395), (-22.9352548858, 4.3270620373), (-28.4805696202, 3.1292752607))
        make_face()
        with BuildLine():
            ThreePointArc((-16.9560426049, 3.6681013667), (-24.1490159543, 6.3952313837), (-31.2706908491, 3.4869930119))
            ThreePointArc((-31.2706908491, 3.4869930119), (-24.1489246045, 6.3880111742), (-16.9560426049, 3.6681013667))
        make_face()
    extrude(amount=F13_DEPTH)


with BuildPart() as f15:
    # F14 (on Front) → F15 (new body)
    with BuildSketch(Plane.XZ):
        with BuildLine():
            Line((30.527864045, 0), (0.472135955, 0))
            ThreePointArc((0.472135955, 0), (-10, -4), (0.472135955, -8))
            Line((0.472135955, -8), (30.527864045, -8))
            ThreePointArc((30.527864045, -8), (41, -4), (30.527864045, 0))
        make_face()
        with Locations((-4, -4)):
            Circle(F14_R, mode=Mode.SUBTRACT)
        with Locations((35, -4)):
            Circle(F14_R, mode=Mode.SUBTRACT)
    extrude(amount=F15_DEPTH)


solid = Compound([f1.part, f3.part, f5.part, f7.part, f9.part, f11.part, f13.part, f15.part])
